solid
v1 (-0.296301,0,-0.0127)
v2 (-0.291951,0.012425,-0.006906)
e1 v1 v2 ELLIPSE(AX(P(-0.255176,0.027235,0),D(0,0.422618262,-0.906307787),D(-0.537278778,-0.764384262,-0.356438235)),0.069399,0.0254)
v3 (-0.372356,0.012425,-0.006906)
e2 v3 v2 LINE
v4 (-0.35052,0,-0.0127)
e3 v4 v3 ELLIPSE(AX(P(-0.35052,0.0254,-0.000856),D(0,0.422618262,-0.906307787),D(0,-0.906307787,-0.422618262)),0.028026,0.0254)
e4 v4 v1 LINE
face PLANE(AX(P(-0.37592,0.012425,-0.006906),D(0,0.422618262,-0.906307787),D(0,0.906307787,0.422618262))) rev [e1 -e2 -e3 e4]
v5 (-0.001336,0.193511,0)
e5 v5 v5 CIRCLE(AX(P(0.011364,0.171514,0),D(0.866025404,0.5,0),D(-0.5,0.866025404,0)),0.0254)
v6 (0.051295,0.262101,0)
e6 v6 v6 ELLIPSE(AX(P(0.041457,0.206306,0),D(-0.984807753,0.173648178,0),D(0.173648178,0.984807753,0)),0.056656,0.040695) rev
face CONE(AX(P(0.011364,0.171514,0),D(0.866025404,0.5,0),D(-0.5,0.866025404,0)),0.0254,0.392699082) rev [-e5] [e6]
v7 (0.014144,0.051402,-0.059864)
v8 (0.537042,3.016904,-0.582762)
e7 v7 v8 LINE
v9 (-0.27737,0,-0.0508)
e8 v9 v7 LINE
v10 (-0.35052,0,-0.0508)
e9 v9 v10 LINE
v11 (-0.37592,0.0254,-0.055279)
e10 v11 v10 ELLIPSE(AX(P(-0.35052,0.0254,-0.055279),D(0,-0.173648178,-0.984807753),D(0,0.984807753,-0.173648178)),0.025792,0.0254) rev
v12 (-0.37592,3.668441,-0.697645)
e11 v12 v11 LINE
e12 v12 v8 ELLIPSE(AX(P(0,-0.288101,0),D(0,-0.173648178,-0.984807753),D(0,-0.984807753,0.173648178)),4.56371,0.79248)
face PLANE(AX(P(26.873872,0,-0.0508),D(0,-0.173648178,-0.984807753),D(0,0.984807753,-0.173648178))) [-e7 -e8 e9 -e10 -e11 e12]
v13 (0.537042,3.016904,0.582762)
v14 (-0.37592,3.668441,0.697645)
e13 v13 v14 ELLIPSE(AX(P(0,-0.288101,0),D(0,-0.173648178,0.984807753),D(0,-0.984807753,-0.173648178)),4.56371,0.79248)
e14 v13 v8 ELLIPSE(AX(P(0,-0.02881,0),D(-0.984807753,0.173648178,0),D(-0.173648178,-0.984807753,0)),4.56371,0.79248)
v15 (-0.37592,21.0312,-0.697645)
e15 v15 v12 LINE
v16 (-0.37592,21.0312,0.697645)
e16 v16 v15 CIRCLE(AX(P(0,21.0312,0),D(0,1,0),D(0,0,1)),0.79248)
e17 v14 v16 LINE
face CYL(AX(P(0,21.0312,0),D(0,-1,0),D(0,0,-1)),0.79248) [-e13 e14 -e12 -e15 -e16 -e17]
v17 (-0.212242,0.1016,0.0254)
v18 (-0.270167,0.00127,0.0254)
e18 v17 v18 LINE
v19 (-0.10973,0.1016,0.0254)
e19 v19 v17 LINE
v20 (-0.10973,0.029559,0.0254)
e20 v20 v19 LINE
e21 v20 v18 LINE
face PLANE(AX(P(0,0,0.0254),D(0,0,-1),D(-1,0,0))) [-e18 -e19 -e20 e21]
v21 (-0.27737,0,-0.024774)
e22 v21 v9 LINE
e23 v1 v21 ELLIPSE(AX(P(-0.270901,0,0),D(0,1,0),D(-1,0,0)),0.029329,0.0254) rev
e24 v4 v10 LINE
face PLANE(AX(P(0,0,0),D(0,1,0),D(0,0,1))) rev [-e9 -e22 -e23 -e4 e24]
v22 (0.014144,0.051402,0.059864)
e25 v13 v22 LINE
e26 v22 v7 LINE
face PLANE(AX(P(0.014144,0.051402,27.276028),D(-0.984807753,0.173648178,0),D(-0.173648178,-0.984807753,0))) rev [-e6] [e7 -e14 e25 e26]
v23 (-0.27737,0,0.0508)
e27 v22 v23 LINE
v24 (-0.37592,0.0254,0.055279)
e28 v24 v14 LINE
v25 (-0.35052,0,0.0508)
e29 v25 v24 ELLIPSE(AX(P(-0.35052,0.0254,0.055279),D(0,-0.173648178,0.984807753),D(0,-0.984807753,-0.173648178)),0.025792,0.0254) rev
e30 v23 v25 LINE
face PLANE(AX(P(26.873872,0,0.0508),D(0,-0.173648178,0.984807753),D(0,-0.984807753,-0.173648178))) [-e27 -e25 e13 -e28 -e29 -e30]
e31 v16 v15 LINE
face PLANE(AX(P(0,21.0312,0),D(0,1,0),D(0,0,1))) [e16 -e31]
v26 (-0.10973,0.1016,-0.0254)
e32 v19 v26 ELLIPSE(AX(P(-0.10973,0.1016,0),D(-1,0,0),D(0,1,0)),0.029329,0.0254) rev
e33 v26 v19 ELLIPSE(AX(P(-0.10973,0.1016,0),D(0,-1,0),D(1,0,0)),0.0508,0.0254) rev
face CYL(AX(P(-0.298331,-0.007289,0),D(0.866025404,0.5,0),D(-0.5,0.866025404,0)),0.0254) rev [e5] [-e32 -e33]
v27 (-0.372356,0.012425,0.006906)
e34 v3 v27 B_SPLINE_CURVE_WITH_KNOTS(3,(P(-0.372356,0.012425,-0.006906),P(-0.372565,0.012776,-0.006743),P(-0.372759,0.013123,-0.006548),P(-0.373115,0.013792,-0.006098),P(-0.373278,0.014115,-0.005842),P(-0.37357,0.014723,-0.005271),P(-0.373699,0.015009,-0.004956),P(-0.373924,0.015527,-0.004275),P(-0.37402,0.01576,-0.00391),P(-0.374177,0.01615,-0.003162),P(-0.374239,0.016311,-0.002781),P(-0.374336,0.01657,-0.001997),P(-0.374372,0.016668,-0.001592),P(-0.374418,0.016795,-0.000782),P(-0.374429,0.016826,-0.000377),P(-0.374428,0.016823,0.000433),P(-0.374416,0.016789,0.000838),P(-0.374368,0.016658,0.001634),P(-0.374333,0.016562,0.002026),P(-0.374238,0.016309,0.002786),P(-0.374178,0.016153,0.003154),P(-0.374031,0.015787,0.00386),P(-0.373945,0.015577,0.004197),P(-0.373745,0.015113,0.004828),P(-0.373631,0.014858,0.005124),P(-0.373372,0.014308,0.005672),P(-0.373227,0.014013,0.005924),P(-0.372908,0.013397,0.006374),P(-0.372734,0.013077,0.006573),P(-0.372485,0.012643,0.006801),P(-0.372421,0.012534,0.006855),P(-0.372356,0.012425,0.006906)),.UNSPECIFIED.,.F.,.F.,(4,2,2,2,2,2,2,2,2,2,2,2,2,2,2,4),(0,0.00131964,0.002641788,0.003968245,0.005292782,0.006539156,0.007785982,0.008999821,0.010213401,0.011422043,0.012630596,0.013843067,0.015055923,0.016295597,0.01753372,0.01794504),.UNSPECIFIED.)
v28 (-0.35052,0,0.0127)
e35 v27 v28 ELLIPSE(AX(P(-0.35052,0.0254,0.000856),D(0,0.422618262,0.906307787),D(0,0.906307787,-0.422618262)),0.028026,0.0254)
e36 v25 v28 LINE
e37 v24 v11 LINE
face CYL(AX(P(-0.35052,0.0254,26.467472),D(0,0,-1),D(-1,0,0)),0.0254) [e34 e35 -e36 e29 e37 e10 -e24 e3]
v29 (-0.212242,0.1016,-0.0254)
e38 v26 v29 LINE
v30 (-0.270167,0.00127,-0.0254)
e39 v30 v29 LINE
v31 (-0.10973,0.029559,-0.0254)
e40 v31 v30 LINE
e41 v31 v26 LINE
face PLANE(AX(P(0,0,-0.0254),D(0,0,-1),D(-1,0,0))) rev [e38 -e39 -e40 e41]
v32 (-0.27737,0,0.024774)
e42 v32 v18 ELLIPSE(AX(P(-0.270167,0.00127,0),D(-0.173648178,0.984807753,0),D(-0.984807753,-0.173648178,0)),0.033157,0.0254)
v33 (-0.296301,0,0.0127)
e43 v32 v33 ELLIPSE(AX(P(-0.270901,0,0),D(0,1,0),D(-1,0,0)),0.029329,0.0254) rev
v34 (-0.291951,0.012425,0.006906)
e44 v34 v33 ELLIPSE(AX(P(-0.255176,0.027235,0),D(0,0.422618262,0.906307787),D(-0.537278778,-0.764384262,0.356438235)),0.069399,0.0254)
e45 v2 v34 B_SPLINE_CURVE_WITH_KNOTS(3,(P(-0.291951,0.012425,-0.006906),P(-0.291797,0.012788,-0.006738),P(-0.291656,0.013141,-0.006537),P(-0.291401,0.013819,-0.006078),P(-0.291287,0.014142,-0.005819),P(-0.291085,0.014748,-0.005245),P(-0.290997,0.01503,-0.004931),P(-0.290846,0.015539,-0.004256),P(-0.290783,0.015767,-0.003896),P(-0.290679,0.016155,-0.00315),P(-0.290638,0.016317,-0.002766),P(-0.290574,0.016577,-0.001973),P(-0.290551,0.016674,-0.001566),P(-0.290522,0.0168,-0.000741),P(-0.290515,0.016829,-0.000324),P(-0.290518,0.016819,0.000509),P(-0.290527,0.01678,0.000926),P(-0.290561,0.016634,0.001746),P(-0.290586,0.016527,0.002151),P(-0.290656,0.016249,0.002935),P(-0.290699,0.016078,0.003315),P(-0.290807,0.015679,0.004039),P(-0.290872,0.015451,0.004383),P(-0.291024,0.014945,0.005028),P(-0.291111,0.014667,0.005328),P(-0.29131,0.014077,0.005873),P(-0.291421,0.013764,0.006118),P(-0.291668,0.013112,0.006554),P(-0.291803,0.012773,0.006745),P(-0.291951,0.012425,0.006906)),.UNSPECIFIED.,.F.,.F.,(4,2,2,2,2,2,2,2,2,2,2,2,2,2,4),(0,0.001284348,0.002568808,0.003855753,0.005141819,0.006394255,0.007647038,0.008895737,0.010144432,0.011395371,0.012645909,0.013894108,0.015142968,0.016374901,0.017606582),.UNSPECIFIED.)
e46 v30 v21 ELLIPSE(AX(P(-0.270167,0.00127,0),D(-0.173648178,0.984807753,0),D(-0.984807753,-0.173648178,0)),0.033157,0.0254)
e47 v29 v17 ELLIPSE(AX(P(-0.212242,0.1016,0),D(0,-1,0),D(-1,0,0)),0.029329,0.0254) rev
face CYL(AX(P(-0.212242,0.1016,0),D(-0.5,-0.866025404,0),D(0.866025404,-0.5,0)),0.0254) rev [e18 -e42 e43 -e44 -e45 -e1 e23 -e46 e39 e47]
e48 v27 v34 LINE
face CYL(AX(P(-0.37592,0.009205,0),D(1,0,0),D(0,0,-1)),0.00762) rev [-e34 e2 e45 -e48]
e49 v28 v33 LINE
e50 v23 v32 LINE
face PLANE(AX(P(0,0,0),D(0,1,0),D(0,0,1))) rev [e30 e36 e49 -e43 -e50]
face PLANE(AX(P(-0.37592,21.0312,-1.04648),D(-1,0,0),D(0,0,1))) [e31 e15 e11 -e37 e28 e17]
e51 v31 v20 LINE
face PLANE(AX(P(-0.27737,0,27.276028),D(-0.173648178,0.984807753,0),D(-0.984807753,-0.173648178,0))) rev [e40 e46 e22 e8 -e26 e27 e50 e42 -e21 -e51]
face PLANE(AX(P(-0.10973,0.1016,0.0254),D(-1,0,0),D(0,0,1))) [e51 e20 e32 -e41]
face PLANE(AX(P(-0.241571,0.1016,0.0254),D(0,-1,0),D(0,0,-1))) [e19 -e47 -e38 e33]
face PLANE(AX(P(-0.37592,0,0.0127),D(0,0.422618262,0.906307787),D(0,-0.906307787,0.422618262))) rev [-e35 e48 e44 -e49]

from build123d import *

# Parameters (mm, degrees)
TD_SKETCH_R                             = 0.79248
TL_FEATURE_DEPTH                        = 21.0312
TDF_STD_SKETCH_W                        = 2.09296
TDF_STD_SKETCH_H                        = 2.09296
TDF_STD_FEATURE_DEPTH                   = 22.061040395
ISA_20_STD_FEATURE_DEPTH                = 22.061040395
ISA_20_STD_FEATURE_DEPTH_BACK           = 22.061040395
F_10BA_STD_FEATURE_DEPTH                = 22.061040395
F_10BA_STD_FEATURE_DEPTH_BACK           = 22.061040395
FRO_STD_FEATURE_DEPTH                   = 22.061040395
FRO_STD_FEATURE_DEPTH_BACK              = 22.061040395
VG_STD_FEATURE_DEPTH                    = 22.061040395
VG_STD_FEATURE_DEPTH_BACK               = 22.061040395
ERW_STD_FEATURE_DEPTH                   = 0.0254
H_STD_FEATURE_REACH                     = 22.889
H_STD_SKETCH_R                          = 0.0254
H_STD_SKETCH_3_R                        = 0.0254
FUNNEL_FINAL_DIAMETRE_STD_FEATURE_DEPTH = 2.499995
FUNNEL_FINAL_DIAMETRE_STD_FEATURE_DRAFT = -22.5
ROUND_BR_STD_FEATURE_START              = -1
ROUND_BR_STD_FEATURE_DEPTH              = 1.033123165


with BuildPart() as part:
    # TD_sketch → TL_feature (new body)
    with BuildSketch(Plane(origin=(0, 0, 0), x_dir=(1, 0, 0), z_dir=(0, 1, 0))):
        with Locations(Location((0, 0, 0), (0, 0, 270))):
            Circle(TD_SKETCH_R)
    extrude(amount=TL_FEATURE_DEPTH)

    # TDF_STD_sketch → TDF_STD_feature (cut, through all)
    with BuildSketch(Plane(origin=(0, 0, 0), x_dir=(1, 0, 0), z_dir=(0, 1, 0))):
        with Locations((-1.4224, 0)):
            Rectangle(TDF_STD_SKETCH_W, TDF_STD_SKETCH_H)
    extrude(amount=TDF_STD_FEATURE_DEPTH, mode=Mode.SUBTRACT)

    # ISA_20_STD_sketch → ISA_20_STD_feature (cut, two sides: drawn at the far end of the back side and taken through both)
    with BuildSketch(Plane(origin=(0, 0, 0), x_dir=(0, 0, -1), z_dir=(1, 0, 0)).offset(-ISA_20_STD_FEATURE_DEPTH_BACK)):
        Polygon((-12.968809457, 73.261672178), (-3.759167997, 21.0312), (-0.0508, 0), (0.0508, 0), (3.759167997, 21.0312), (12.968809457, 73.261672178), (12.968809457, -32.810750623), (-12.968809457, -32.810750623), align=None)
    extrude(amount=ISA_20_STD_FEATURE_DEPTH + ISA_20_STD_FEATURE_DEPTH_BACK, mode=Mode.SUBTRACT)

    # 10BA_STD_sketch → 10BA_STD_feature (cut, two sides: drawn at the far end of the back side and taken through both)
    with BuildSketch(Plane.XY.offset(-F_10BA_STD_FEATURE_DEPTH_BACK)):
        Polygon((-53.226091717, 0), (-0.37592, 0), (-0.277370032, 0), (0.014143507, 0.051401702), (3.713447997, 21.0312), (12.890784005, 73.078458855), (91.272293615, 2.163710365), (25.155417893, -70.914748491), align=None)
    extrude(amount=F_10BA_STD_FEATURE_DEPTH + F_10BA_STD_FEATURE_DEPTH_BACK, mode=Mode.SUBTRACT)

    # FRO_STD_sketch → FRO_STD_feature (cut, two sides: drawn at the far end of the back side and taken through both)
    with BuildSketch(Plane.XY.offset(-FRO_STD_FEATURE_DEPTH_BACK)):
        with BuildLine():
            Line((-0.37592, 52.149873762), (-0.37592, 0.0254))
            ThreePointArc((-0.37592, 0.0254), (-0.368480512, 0.007439488), (-0.35052, 0))
            Line((-0.35052, 0), (51.773953762, 0))
            Line((51.773953762, 0), (-21.941183964, -73.715137726))
            Line((-21.941183964, -73.715137726), (-74.091057726, -21.565263964))
            Line((-74.091057726, -21.565263964), (-0.37592, 52.149873762))
        make_face()
    extrude(amount=FRO_STD_FEATURE_DEPTH + FRO_STD_FEATURE_DEPTH_BACK, mode=Mode.SUBTRACT)

    # VG_STD_sketch → VG_STD_feature (cut, two sides: drawn at the far end of the back side and taken through both)
    with BuildSketch(Plane(origin=(0, 0, 0), x_dir=(0, 0, -1), z_dir=(1, 0, 0)).offset(-VG_STD_FEATURE_DEPTH_BACK)):
        with BuildLine():
            Line((-0.0127, 0), (-0.006906065, 0.012425133))
            ThreePointArc((-0.006906065, 0.012425133), (0, 0.016824782), (0.006906065, 0.012425133))
            Line((0.006906065, 0.012425133), (0.0127, 0))
            Line((0.0127, 0), (-0.0127, 0))
        make_face()
    extrude(amount=VG_STD_FEATURE_DEPTH + VG_STD_FEATURE_DEPTH_BACK, mode=Mode.SUBTRACT)


with BuildPart() as body_2:
    # ERW_STD_sketch → ERW_STD_feature (new, symmetric)
    with BuildSketch(Plane.XY):
        Polygon((-0.109730032, 0.1016), (-0.109730032, 0), (-0.300230032, 0), (-0.241571245, 0.1016), align=None)
    extrude(amount=ERW_STD_FEATURE_DEPTH, both=True)

    # H_STD_sketch → H_STD_feature (add, up to next)
    with BuildSketch(Plane(origin=(0.011364425, 0.171513918, 0), x_dir=(0, 0, -1), z_dir=(0.8660254037844415, 0.4999999999999953, 0)), mode=Mode.PRIVATE) as h_std_feature_sk1:
        with Locations(Location((0, 0, 0), (0, 0, 90))):
            Circle(H_STD_SKETCH_R)
    h_std_feature_tool1 = extrude(h_std_feature_sk1.sketch, amount=-H_STD_FEATURE_REACH, mode=Mode.PRIVATE) - body_2.part
    add(h_std_feature_tool1.solids().sort_by_distance((0.011364, 0.171514, 0))[0])


with BuildPart() as funnel_final_diametre_std_feature_tool:
    # H_STD_sketch<3> → funnel_final_diametre_STD_feature (with draft: the straight prism first)
    with BuildSketch(Plane(origin=(0.011364425, 0.171513918, 0), x_dir=(0, 0, -1), z_dir=(0.8660254037844415, 0.4999999999999953, 0))):
        with Locations(Location((0, 0, 0), (0, 0, 90))):
            Circle(H_STD_SKETCH_3_R)
    extrude(amount=FUNNEL_FINAL_DIAMETRE_STD_FEATURE_DEPTH)
    # funnel_final_diametre_STD_feature: the draft: its side faces are tilted about the plane it starts from
    funnel_final_diametre_std_feature_sides = [funnel_final_diametre_std_feature_tool.faces().sort_by_distance(p)[0] for p in [
        (1.106594015, 0.774515622, 0),
    ]]
    draft(funnel_final_diametre_std_feature_sides, Plane(origin=(0.011364425, 0.171513918, 0), x_dir=(0, 0, -1), z_dir=(0.8660254037844415, 0.4999999999999953, 0)), FUNNEL_FINAL_DIAMETRE_STD_FEATURE_DRAFT)


with BuildPart() as body_2_1:
    add(body_2.part)

    # funnel_final_diametre_STD_feature: add funnel_final_diametre_std_feature_tool
    add(funnel_final_diametre_std_feature_tool.part)

    # ROUND_BR_STD_feature: read off the stored shape, not the designer's step
    # ROUND_BR_STD_feature outline → ROUND_BR_STD_feature (cut)
    with BuildSketch(Plane(origin=(0, 0, 0), x_dir=(0.8660254037844362, -0.5000000000000042, 0), z_dir=(0.5000000000000042, 0.8660254037844363, 0)).offset(ROUND_BR_STD_FEATURE_START)):
        with BuildLine():
            Line((-0.260006835, -0.0254), (-0.234606835, -0.0254))
            ThreePointArc((-0.234606835, -0.0254), (-0.252567347, -0.017960512), (-0.260006835, 0))
            Line((-0.260006835, 0), (-0.260006835, -0.0254))
        make_face()
        with BuildLine():
            Line((-0.260006835, 0.0254), (-0.260006835, 0))
            ThreePointArc((-0.260006835, 0), (-0.252567347, 0.017960512), (-0.234606835, 0.0254))
            Line((-0.234606835, 0.0254), (-0.260006835, 0.0254))
        make_face()
    extrude(amount=ROUND_BR_STD_FEATURE_DEPTH, mode=Mode.SUBTRACT)


with BuildPart() as part_1:
    add(part.part)

    # COMBINE_STD_feature: cut body 2
    add(body_2_1.part, mode=Mode.SUBTRACT)


solid = part_1.part
